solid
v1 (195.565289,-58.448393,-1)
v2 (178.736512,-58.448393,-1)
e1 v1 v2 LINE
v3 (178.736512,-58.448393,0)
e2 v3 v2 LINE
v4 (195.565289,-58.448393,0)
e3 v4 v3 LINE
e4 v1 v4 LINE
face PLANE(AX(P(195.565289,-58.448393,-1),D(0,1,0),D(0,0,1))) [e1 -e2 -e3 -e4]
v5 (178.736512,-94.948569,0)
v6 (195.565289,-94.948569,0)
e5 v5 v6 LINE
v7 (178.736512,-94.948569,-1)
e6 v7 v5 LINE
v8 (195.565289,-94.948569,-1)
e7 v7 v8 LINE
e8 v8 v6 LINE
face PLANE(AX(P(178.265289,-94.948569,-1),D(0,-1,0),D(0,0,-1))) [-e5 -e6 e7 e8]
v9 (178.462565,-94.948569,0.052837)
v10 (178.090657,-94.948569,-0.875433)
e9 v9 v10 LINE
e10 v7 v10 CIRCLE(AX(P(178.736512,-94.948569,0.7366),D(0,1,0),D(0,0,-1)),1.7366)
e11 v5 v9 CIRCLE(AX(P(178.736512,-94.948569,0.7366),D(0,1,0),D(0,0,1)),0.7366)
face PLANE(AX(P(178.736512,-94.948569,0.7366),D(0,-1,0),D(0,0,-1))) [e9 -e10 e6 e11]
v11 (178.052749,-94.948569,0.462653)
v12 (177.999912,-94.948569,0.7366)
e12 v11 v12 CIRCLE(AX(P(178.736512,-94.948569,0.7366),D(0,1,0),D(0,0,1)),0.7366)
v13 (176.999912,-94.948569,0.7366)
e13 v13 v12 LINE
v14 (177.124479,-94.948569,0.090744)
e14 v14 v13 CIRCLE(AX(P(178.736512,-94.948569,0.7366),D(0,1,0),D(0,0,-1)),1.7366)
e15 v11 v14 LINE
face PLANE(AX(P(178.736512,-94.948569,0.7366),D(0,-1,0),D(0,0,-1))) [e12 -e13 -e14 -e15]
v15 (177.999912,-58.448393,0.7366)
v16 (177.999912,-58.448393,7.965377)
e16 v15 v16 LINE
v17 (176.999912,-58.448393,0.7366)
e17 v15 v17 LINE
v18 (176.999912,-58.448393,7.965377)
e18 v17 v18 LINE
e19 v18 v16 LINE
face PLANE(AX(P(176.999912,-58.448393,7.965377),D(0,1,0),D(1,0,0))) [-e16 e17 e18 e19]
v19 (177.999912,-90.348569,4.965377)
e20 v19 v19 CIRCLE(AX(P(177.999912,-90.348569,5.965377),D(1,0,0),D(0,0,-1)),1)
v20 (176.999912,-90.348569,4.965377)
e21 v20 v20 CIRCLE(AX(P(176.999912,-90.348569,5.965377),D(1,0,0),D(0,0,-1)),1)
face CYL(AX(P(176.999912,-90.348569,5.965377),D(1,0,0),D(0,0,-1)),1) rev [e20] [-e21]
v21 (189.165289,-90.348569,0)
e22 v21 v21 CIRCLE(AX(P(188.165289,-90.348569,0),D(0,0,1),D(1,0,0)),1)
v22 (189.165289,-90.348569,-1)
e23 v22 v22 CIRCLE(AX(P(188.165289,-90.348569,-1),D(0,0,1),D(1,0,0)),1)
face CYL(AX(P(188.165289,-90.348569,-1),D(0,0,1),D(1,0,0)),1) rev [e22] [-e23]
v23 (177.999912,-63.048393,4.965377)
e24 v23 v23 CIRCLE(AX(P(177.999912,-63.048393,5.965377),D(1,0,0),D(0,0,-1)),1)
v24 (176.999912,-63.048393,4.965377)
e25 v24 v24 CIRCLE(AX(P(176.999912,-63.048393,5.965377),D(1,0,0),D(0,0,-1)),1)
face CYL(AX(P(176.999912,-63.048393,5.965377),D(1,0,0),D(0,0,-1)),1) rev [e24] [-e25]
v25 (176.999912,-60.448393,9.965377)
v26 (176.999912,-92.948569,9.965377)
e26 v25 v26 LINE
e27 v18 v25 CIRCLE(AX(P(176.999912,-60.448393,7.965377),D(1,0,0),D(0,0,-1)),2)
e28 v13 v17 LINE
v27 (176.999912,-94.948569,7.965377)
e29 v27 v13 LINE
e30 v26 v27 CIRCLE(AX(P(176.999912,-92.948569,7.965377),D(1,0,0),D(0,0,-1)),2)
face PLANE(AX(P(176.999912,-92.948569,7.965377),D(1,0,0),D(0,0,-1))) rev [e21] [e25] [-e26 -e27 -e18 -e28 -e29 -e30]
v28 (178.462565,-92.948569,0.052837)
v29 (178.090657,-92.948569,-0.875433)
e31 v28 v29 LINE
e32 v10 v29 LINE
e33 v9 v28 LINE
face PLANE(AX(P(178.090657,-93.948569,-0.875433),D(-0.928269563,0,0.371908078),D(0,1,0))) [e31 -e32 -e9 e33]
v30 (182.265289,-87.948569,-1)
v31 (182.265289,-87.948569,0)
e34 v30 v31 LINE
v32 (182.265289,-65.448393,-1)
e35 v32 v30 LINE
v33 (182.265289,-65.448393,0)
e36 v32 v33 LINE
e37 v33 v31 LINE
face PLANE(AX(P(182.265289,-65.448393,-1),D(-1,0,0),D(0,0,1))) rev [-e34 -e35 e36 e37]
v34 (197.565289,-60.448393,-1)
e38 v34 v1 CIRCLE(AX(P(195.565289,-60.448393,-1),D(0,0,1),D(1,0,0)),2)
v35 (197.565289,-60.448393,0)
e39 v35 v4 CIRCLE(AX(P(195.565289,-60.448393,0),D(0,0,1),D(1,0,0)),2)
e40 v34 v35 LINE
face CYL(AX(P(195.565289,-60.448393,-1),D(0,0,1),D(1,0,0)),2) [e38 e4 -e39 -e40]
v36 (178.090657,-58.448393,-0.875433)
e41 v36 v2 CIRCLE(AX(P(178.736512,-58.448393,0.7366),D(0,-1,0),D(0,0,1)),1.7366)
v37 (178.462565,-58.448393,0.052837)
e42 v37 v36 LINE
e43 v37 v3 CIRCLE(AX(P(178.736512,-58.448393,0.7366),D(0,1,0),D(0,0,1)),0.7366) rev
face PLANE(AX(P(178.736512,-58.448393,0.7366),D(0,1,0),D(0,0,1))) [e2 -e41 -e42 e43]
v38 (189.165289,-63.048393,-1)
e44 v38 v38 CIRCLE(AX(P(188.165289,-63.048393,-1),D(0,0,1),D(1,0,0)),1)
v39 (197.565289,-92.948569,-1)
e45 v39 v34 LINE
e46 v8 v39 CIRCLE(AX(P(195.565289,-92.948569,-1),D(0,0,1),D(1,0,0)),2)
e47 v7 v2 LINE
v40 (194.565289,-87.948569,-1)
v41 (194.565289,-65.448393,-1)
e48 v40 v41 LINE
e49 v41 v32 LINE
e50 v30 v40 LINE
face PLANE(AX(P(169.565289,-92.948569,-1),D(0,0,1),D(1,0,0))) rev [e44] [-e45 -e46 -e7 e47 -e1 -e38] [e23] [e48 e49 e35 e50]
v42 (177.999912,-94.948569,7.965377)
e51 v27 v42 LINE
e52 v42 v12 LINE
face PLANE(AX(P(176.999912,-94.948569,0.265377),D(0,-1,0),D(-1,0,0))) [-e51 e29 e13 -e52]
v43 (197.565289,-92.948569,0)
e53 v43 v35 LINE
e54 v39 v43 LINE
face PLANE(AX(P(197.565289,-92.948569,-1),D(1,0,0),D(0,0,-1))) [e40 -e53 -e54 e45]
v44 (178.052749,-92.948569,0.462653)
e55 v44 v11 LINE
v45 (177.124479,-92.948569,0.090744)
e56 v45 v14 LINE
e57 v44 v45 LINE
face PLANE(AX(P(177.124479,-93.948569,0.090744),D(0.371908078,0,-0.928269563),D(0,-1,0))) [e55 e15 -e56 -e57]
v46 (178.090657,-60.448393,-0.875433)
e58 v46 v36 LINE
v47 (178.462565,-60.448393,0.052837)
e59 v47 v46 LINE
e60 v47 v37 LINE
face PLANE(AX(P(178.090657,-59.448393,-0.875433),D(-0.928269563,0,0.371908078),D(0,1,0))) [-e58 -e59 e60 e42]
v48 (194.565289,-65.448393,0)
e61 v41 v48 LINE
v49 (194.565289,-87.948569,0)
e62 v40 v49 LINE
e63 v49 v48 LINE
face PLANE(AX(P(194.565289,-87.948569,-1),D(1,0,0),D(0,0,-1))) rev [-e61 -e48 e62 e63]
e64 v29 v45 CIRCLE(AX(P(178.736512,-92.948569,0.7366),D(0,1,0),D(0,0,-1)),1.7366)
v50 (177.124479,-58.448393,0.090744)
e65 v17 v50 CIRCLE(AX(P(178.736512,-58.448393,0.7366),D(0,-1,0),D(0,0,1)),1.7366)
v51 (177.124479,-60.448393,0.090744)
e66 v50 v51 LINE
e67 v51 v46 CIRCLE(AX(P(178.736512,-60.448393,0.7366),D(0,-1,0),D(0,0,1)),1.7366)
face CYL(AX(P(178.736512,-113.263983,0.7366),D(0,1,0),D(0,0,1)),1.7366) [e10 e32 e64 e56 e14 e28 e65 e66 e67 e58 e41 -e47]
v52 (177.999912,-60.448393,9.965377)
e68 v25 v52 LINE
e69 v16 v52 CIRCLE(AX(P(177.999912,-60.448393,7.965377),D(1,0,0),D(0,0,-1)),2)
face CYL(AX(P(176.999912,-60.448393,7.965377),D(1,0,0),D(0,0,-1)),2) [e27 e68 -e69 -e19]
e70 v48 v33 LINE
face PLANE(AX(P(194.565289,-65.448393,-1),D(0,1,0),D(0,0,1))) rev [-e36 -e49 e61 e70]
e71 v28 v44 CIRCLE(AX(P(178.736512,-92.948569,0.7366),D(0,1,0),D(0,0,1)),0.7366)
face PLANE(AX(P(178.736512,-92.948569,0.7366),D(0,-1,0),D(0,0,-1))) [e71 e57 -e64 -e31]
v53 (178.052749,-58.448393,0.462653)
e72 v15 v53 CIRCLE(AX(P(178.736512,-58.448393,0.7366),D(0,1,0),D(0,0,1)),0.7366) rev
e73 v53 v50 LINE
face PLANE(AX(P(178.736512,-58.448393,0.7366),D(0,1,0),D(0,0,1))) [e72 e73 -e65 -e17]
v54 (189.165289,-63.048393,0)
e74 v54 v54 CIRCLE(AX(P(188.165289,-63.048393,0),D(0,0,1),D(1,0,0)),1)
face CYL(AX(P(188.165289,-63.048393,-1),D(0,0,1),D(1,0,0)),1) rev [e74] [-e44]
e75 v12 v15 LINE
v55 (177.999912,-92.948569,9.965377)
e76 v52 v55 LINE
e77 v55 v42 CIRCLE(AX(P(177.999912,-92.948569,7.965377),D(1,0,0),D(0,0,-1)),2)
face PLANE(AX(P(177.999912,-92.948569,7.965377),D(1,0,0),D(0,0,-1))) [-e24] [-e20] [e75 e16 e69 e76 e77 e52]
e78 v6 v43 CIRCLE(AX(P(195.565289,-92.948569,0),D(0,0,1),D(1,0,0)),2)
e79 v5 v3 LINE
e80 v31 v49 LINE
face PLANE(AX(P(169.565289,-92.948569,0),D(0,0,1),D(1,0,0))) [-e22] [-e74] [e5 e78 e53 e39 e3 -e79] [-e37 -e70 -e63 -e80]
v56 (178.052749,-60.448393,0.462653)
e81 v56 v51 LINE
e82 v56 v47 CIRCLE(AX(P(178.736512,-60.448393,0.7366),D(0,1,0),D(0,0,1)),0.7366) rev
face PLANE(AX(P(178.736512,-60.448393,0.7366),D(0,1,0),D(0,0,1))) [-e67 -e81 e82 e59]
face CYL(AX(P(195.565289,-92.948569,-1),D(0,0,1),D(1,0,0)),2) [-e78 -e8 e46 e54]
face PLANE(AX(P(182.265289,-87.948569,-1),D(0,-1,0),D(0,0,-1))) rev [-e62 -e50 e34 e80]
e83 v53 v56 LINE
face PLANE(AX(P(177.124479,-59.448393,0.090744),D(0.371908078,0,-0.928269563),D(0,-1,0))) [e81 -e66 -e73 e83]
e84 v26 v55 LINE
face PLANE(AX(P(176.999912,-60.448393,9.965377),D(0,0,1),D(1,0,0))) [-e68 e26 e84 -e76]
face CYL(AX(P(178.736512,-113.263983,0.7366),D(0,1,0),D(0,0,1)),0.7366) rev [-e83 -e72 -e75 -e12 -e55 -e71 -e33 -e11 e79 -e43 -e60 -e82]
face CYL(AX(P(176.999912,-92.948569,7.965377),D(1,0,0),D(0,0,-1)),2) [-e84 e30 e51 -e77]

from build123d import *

# Parameters (mm, degrees)
MODEL_R                         = 1
MODEL_W                         = 12.3
MODEL_H                         = 22.500175579
BRIDA_BASE1_DEPTH               = 1
PLIEGUE_START                   = -94.948568727
PLIEGUE_CROQUIZADO1_DEPTH       = 36.500175579
PLIEGUE_CROQUIZADO1_2_DEPTH     = 2
PLIEGUE_START_2                 = -60.448393148
PLIEGUE_CROQUIZADO1_3_DEPTH     = 2
PLIEGUE_CROQUIZADO1_4_DEPTH     = 36.500175579
PLIEGUE_START_3                 = -92.948568727
PLIEGUE_CROQUIZADO1_5_DEPTH     = 32.500175579
PLIEGUE_START_4                 = 176.99991226
PLIEGUE_CROQUIZADO1_6_OUTLINE_R = 1
PLIEGUE_CROQUIZADO1_6_DEPTH     = 1


with BuildPart() as part:
    # Brida base1: sheet metal written as solids
    # Model → Brida base1 (new body)
    with BuildSketch(Plane.XY):
        with BuildLine():
            Line((178.265288891, -94.948568727), (178.265288891, -92.948568727))
            Line((178.265288891, -92.948568727), (177.265288891, -92.948568727))
            Line((177.265288891, -92.948568727), (177.265288891, -94.948568727))
            Line((177.265288891, -94.948568727), (169.565288891, -94.948568727))
            ThreePointArc((169.565288891, -94.948568727), (168.151075328, -94.362782289), (167.565288891, -92.948568727))
            Line((167.565288891, -92.948568727), (167.565288891, -60.448393148))
            ThreePointArc((167.565288891, -60.448393148), (168.151075328, -59.034179585), (169.565288891, -58.448393148))
            Line((169.565288891, -58.448393148), (177.265288891, -58.448393148))
            Line((177.265288891, -58.448393148), (177.265288891, -60.448393148))
            Line((177.265288891, -60.448393148), (178.265288891, -60.448393148))
            Line((178.265288891, -60.448393148), (178.265288891, -58.448393148))
            Line((178.265288891, -58.448393148), (195.565288891, -58.448393148))
            ThreePointArc((195.565288891, -58.448393148), (196.979502453, -59.034179585), (197.565288891, -60.448393148))
            Line((197.565288891, -60.448393148), (197.565288891, -92.948568727))
            ThreePointArc((197.565288891, -92.948568727), (196.979502453, -94.362782289), (195.565288891, -94.948568727))
            Line((195.565288891, -94.948568727), (178.265288891, -94.948568727))
        make_face()
        with Locations((171.565288891, -90.348568727)):
            Circle(MODEL_R, mode=Mode.SUBTRACT)
        with Locations((171.565288891, -63.048393148)):
            Circle(MODEL_R, mode=Mode.SUBTRACT)
        with Locations((188.165288891, -63.048393148)):
            Circle(MODEL_R, mode=Mode.SUBTRACT)
        with Locations((188.165288891, -90.348568727)):
            Circle(MODEL_R, mode=Mode.SUBTRACT)
        with Locations((188.415288891, -76.698480938)):
            Rectangle(MODEL_W, MODEL_H, mode=Mode.SUBTRACT)
    extrude(amount=-BRIDA_BASE1_DEPTH)

    # Pliegue croquizado1: read off the stored shape, not the designer's step
    # Pliegue croquizado1 outline → Pliegue croquizado1 (cut)
    with BuildSketch(Plane(origin=(0, 0, 0), x_dir=(1, 0, 0), z_dir=(0, 1, 0)).offset(PLIEGUE_START)):
        with BuildLine():
            Line((167.565288891, 0), (177.163871169, 0))
            ThreePointArc((177.163871169, 0), (177.804686096, 0.728828115), (178.73651226, 1))
            Line((178.73651226, 1), (167.565288891, 1))
            Line((167.565288891, 1), (167.565288891, 0))
        make_face()
    extrude(amount=PLIEGUE_CROQUIZADO1_DEPTH, mode=Mode.SUBTRACT)

    # Pliegue croquizado1 2 outline → Pliegue croquizado1 2 (cut)
    with BuildSketch(Plane(origin=(0, 0, 0), x_dir=(1, 0, 0), z_dir=(0, 1, 0)).offset(PLIEGUE_START)):
        with BuildLine():
            ThreePointArc((177.265288891, 0.186049099), (177.211739726, 0.094572835), (177.163871169, 0))
            Line((177.163871169, 0), (177.265288891, 0))
            Line((177.265288891, 0), (177.265288891, 0.186049099))
        make_face()
        Polygon((178.265288891, 0), (178.441395947, 0), (178.265288891, 0.439557056), align=None)
    extrude(amount=PLIEGUE_CROQUIZADO1_2_DEPTH, mode=Mode.SUBTRACT)

    # Pliegue croquizado1 3 outline → Pliegue croquizado1 3 (cut)
    with BuildSketch(Plane(origin=(0, 0, 0), x_dir=(1, 0, 0), z_dir=(0, 1, 0)).offset(PLIEGUE_START_2)):
        with BuildLine():
            ThreePointArc((177.265288891, 0.186049099), (177.211739726, 0.094572835), (177.163871169, 0))
            Line((177.163871169, 0), (177.265288891, 0))
            Line((177.265288891, 0), (177.265288891, 0.186049099))
        make_face()
        Polygon((178.265288891, 0), (178.441395947, 0), (178.265288891, 0.439557056), align=None)
    extrude(amount=PLIEGUE_CROQUIZADO1_3_DEPTH, mode=Mode.SUBTRACT)

    # Pliegue croquizado1 4 outline → Pliegue croquizado1 4 (add)
    with BuildSketch(Plane(origin=(0, 0, 0), x_dir=(1, 0, 0), z_dir=(0, 1, 0)).offset(PLIEGUE_START)):
        with BuildLine():
            Line((176.99991226, -9.965376631), (177.99991226, -9.965376631))
            Line((177.99991226, -9.965376631), (177.99991226, -0.7366))
            ThreePointArc((177.99991226, -0.7366), (178.01324203, -0.597101848), (178.0527489, -0.46265251))
            Line((178.0527489, -0.46265251), (177.124479337, -0.090744432))
            ThreePointArc((177.124479337, -0.090744432), (177.031338378, -0.407720702), (176.99991226, -0.7366))
            Line((176.99991226, -0.7366), (176.99991226, -9.965376631))
        make_face()
        with BuildLine():
            Line((178.441395947, 0), (178.462564769, -0.05283664))
            ThreePointArc((178.462564769, -0.05283664), (178.597014107, -0.01332977), (178.73651226, 0))
            Line((178.73651226, 0), (178.441395947, 0))
        make_face()
        with BuildLine():
            Line((178.090656691, 0.875432923), (178.265288891, 0.439557056))
            Line((178.265288891, 0.439557056), (178.265288891, 0.934844913))
            ThreePointArc((178.265288891, 0.934844913), (178.17718339, 0.907459237), (178.090656691, 0.875432923))
        make_face()
    extrude(amount=PLIEGUE_CROQUIZADO1_4_DEPTH)

    # Pliegue croquizado1 5 outline → Pliegue croquizado1 5 (add)
    with BuildSketch(Plane(origin=(0, 0, 0), x_dir=(1, 0, 0), z_dir=(0, 1, 0)).offset(PLIEGUE_START_3)):
        with BuildLine():
            Line((177.124479337, -0.090744432), (178.0527489, -0.46265251))
            ThreePointArc((178.0527489, -0.46265251), (178.215657405, -0.215745145), (178.462564769, -0.05283664))
            Line((178.462564769, -0.05283664), (178.441395947, 0))
            Line((178.441395947, 0), (177.163871169, 0))
            ThreePointArc((177.163871169, 0), (177.143528964, -0.045091664), (177.124479337, -0.090744432))
        make_face()
    extrude(amount=PLIEGUE_CROQUIZADO1_5_DEPTH)

    # Pliegue croquizado1 6 outline → Pliegue croquizado1 6 (cut)
    with BuildSketch(Plane.YZ.offset(PLIEGUE_START_4)):
        with BuildLine():
            Line((-58.448393148, 9.965376631), (-60.448393148, 9.965376631))
            ThreePointArc((-60.448393148, 9.965376631), (-59.034179585, 9.379590194), (-58.448393148, 7.965376631))
            Line((-58.448393148, 7.965376631), (-58.448393148, 9.965376631))
        make_face()
        with BuildLine():
            ThreePointArc((-94.948568727, 7.965376631), (-94.362782289, 9.379590194), (-92.948568727, 9.965376631))
            Line((-92.948568727, 9.965376631), (-94.948568727, 9.965376631))
            Line((-94.948568727, 9.965376631), (-94.948568727, 7.965376631))
        make_face()
        with Locations((-90.348568727, 5.965376631)):
            Circle(PLIEGUE_CROQUIZADO1_6_OUTLINE_R)
        with Locations((-63.048393148, 5.965376631)):
            Circle(PLIEGUE_CROQUIZADO1_6_OUTLINE_R)
    extrude(amount=PLIEGUE_CROQUIZADO1_6_DEPTH, mode=Mode.SUBTRACT)


solid = part.part
